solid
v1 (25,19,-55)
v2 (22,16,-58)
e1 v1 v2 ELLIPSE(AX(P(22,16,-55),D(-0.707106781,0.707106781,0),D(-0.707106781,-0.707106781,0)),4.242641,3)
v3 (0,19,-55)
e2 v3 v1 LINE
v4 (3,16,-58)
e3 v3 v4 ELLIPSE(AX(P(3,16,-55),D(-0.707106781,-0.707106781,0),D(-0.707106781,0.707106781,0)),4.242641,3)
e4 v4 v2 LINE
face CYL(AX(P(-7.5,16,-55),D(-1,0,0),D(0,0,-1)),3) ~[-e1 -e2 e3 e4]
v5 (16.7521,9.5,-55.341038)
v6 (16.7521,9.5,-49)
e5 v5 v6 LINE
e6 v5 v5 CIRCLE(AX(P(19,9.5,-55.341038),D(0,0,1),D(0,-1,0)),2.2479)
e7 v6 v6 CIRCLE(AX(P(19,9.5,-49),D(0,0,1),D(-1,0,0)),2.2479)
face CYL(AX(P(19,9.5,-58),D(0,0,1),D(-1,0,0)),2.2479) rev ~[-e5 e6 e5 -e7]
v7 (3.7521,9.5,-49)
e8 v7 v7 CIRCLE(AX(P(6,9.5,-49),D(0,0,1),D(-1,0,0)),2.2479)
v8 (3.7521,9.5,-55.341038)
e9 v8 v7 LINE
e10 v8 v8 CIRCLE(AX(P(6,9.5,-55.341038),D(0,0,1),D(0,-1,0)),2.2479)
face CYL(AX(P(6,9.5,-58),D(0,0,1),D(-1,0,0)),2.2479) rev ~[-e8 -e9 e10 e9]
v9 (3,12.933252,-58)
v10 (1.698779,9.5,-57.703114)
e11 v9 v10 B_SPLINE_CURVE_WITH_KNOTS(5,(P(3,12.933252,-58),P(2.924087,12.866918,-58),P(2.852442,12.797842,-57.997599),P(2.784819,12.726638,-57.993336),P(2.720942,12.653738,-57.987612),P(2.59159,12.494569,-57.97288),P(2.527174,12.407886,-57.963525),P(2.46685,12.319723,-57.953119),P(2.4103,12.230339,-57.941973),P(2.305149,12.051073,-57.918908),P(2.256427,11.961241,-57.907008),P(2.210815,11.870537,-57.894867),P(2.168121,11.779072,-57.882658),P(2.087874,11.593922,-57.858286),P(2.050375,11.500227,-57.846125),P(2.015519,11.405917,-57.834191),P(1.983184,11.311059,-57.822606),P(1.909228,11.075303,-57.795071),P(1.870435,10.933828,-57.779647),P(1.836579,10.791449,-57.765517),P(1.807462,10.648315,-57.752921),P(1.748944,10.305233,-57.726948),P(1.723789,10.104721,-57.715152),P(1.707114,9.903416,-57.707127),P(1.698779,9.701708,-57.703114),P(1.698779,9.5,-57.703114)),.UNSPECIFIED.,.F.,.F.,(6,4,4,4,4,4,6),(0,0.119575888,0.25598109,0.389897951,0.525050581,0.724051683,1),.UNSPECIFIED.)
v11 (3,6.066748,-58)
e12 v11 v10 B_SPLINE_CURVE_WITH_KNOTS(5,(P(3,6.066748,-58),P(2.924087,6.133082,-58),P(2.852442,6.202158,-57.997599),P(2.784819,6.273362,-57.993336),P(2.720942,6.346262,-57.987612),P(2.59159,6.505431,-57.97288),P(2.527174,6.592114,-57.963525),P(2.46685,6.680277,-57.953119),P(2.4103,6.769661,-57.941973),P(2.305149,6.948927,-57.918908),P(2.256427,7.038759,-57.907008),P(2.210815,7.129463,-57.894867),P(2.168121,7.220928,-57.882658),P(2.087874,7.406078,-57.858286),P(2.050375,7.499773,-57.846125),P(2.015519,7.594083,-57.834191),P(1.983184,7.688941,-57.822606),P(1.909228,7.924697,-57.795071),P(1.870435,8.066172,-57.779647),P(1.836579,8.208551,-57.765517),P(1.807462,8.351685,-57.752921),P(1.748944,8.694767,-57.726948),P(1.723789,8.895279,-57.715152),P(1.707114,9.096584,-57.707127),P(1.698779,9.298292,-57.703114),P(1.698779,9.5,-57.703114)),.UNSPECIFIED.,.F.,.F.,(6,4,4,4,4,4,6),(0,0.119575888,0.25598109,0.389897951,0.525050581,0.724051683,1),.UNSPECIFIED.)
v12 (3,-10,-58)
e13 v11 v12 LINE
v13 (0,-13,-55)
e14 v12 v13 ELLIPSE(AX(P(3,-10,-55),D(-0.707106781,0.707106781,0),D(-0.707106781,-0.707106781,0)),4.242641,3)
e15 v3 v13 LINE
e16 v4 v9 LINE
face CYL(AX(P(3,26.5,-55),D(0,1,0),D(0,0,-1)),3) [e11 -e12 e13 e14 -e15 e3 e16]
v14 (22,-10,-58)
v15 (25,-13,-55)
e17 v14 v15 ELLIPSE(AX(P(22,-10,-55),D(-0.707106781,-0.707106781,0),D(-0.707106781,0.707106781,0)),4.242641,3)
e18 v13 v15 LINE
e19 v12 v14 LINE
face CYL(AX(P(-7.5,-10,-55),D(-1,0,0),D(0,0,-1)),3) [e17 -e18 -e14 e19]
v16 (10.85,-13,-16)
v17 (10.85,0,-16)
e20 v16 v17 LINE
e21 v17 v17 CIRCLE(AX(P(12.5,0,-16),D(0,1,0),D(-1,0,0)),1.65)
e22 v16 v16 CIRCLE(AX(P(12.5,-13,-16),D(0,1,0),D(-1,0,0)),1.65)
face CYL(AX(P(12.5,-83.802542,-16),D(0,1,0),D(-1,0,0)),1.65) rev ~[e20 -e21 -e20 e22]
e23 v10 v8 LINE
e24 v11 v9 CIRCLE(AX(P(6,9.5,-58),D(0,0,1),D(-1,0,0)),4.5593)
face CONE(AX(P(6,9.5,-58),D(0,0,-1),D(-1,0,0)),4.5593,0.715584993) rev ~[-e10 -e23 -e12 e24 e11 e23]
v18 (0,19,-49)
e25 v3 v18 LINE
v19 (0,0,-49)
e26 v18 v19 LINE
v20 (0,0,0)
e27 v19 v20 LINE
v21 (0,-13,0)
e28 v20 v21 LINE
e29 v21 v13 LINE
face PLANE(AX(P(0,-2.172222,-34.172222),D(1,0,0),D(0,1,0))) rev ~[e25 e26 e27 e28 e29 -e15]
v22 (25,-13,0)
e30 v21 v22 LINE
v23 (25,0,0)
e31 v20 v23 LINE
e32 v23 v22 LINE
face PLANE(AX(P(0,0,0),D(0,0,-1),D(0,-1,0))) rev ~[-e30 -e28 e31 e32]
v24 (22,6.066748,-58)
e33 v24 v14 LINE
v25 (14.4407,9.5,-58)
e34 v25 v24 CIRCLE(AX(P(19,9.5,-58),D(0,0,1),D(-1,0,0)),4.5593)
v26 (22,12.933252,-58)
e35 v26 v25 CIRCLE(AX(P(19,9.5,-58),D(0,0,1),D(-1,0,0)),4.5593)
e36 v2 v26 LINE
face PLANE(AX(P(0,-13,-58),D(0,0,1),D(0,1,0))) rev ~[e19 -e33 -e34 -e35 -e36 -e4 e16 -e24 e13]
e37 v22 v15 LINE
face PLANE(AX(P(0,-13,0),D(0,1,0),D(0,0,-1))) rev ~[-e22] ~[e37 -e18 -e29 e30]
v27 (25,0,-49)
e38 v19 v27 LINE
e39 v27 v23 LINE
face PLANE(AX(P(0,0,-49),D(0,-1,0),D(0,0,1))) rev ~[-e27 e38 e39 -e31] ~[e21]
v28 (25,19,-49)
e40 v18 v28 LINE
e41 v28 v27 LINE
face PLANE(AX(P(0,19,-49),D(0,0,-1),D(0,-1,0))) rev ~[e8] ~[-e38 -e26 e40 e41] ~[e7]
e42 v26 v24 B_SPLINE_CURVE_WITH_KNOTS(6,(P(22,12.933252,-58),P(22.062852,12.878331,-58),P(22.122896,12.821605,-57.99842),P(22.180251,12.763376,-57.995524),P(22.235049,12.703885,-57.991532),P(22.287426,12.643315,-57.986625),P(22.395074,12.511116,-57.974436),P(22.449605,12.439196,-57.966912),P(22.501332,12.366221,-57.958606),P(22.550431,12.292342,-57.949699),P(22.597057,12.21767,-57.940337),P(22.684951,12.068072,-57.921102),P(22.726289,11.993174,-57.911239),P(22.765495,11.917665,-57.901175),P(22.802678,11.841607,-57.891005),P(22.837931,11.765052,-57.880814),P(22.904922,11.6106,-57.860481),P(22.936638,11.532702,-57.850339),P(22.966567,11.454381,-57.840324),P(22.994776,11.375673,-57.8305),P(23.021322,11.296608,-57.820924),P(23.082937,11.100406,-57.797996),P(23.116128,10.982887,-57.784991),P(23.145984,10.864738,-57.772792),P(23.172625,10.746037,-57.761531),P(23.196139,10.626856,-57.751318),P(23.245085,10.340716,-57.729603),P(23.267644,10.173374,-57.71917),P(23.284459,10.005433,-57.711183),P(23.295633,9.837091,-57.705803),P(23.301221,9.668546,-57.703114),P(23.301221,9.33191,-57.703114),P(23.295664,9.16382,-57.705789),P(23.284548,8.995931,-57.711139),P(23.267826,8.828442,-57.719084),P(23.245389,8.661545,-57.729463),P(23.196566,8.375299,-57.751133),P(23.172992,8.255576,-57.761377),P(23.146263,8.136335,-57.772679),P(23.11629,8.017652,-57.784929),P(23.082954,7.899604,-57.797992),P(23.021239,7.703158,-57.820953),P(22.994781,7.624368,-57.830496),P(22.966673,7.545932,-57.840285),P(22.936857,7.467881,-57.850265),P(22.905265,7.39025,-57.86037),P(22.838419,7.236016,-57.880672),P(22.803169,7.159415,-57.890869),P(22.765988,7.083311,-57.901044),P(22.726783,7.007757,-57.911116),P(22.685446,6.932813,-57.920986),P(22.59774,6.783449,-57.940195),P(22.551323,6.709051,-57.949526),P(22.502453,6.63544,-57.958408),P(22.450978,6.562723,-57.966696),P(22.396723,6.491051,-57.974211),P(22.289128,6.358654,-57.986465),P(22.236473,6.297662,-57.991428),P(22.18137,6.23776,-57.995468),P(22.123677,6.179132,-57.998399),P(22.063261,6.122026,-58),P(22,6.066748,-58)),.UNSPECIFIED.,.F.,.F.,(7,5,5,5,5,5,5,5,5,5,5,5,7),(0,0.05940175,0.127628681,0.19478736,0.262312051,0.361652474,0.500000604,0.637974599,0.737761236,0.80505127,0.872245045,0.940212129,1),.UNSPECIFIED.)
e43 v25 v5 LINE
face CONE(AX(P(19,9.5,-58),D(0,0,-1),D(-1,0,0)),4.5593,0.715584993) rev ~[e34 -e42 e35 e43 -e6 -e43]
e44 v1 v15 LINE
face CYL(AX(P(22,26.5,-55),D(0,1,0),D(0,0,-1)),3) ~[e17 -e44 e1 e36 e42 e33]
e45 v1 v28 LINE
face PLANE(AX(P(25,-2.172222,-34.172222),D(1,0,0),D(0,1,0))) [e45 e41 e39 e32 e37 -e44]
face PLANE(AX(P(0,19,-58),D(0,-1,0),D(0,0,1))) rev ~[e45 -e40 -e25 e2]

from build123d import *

# Parameters (mm, degrees)
F1_DEPTH       = 25
F3_D           = 4.4958
F3_CSINK_D     = 9.1186
F3_CSINK_ANGLE = 82
F5_D           = 3.3
F6_T1_DEPTH    = 40
F6_T3_DEPTH    = 47


# Not quite as in the source:
# - a fillet or chamfer that OpenCascade refuses, or shapes differently, is made with other operations: its cross-section is extruded or revolved along the edge and cut away or added


with BuildPart() as f1:
    # F0 (on Right) → F1 (new body)
    with BuildSketch(Plane.YZ):
        Polygon((-13, -58), (19, -58), (19, -49), (0, -49), (0, 0), (-13, 0), align=None)
    extrude(amount=F1_DEPTH)

    # F3 (through all)
    with Locations(Plane(origin=(0, 0, -58), x_dir=(1, 0, 0), z_dir=(0, 0, -1))):
        with Locations((6, -9.5), (19, -9.5)):
            CounterSinkHole(F3_D / 2, F3_CSINK_D / 2, counter_sink_angle=F3_CSINK_ANGLE)

    # F5 (through all)
    with Locations(Plane.XZ.offset(13)):
        with Locations((12.5, -16)):
            Hole(F5_D / 2)

    # F6: fillet of radius 3 on 4 edges, made by hand

    # F6_s2 → F6_t1 (cut)
    with BuildSketch(Plane.YZ.offset(-7.5)):
        with BuildLine():
            ThreePointArc((-10, -58), (-12.1213203436, -57.1213203436), (-13, -55))
            Line((-13, -55), (-13, -58))
            Line((-13, -58), (-10, -58))
        make_face()
        with BuildLine():
            ThreePointArc((16, -58), (18.1213203436, -57.1213203436), (19, -55))
            Line((19, -55), (19, -58))
            Line((19, -58), (16, -58))
        make_face()
    extrude(amount=F6_T1_DEPTH, mode=Mode.SUBTRACT)

    # F6_s4 → F6_t3 (cut)
    with BuildSketch(Plane.XZ.offset(-26.5)):
        with BuildLine():
            ThreePointArc((22, -58), (24.1213203436, -57.1213203436), (25, -55))
            Line((25, -55), (25, -58))
            Line((25, -58), (22, -58))
        make_face()
        with BuildLine():
            ThreePointArc((3, -58), (0.8786796564, -57.1213203436), (0, -55))
            Line((0, -55), (0, -58))
            Line((0, -58), (3, -58))
        make_face()
    extrude(amount=F6_T3_DEPTH, mode=Mode.SUBTRACT)


solid = f1.part
